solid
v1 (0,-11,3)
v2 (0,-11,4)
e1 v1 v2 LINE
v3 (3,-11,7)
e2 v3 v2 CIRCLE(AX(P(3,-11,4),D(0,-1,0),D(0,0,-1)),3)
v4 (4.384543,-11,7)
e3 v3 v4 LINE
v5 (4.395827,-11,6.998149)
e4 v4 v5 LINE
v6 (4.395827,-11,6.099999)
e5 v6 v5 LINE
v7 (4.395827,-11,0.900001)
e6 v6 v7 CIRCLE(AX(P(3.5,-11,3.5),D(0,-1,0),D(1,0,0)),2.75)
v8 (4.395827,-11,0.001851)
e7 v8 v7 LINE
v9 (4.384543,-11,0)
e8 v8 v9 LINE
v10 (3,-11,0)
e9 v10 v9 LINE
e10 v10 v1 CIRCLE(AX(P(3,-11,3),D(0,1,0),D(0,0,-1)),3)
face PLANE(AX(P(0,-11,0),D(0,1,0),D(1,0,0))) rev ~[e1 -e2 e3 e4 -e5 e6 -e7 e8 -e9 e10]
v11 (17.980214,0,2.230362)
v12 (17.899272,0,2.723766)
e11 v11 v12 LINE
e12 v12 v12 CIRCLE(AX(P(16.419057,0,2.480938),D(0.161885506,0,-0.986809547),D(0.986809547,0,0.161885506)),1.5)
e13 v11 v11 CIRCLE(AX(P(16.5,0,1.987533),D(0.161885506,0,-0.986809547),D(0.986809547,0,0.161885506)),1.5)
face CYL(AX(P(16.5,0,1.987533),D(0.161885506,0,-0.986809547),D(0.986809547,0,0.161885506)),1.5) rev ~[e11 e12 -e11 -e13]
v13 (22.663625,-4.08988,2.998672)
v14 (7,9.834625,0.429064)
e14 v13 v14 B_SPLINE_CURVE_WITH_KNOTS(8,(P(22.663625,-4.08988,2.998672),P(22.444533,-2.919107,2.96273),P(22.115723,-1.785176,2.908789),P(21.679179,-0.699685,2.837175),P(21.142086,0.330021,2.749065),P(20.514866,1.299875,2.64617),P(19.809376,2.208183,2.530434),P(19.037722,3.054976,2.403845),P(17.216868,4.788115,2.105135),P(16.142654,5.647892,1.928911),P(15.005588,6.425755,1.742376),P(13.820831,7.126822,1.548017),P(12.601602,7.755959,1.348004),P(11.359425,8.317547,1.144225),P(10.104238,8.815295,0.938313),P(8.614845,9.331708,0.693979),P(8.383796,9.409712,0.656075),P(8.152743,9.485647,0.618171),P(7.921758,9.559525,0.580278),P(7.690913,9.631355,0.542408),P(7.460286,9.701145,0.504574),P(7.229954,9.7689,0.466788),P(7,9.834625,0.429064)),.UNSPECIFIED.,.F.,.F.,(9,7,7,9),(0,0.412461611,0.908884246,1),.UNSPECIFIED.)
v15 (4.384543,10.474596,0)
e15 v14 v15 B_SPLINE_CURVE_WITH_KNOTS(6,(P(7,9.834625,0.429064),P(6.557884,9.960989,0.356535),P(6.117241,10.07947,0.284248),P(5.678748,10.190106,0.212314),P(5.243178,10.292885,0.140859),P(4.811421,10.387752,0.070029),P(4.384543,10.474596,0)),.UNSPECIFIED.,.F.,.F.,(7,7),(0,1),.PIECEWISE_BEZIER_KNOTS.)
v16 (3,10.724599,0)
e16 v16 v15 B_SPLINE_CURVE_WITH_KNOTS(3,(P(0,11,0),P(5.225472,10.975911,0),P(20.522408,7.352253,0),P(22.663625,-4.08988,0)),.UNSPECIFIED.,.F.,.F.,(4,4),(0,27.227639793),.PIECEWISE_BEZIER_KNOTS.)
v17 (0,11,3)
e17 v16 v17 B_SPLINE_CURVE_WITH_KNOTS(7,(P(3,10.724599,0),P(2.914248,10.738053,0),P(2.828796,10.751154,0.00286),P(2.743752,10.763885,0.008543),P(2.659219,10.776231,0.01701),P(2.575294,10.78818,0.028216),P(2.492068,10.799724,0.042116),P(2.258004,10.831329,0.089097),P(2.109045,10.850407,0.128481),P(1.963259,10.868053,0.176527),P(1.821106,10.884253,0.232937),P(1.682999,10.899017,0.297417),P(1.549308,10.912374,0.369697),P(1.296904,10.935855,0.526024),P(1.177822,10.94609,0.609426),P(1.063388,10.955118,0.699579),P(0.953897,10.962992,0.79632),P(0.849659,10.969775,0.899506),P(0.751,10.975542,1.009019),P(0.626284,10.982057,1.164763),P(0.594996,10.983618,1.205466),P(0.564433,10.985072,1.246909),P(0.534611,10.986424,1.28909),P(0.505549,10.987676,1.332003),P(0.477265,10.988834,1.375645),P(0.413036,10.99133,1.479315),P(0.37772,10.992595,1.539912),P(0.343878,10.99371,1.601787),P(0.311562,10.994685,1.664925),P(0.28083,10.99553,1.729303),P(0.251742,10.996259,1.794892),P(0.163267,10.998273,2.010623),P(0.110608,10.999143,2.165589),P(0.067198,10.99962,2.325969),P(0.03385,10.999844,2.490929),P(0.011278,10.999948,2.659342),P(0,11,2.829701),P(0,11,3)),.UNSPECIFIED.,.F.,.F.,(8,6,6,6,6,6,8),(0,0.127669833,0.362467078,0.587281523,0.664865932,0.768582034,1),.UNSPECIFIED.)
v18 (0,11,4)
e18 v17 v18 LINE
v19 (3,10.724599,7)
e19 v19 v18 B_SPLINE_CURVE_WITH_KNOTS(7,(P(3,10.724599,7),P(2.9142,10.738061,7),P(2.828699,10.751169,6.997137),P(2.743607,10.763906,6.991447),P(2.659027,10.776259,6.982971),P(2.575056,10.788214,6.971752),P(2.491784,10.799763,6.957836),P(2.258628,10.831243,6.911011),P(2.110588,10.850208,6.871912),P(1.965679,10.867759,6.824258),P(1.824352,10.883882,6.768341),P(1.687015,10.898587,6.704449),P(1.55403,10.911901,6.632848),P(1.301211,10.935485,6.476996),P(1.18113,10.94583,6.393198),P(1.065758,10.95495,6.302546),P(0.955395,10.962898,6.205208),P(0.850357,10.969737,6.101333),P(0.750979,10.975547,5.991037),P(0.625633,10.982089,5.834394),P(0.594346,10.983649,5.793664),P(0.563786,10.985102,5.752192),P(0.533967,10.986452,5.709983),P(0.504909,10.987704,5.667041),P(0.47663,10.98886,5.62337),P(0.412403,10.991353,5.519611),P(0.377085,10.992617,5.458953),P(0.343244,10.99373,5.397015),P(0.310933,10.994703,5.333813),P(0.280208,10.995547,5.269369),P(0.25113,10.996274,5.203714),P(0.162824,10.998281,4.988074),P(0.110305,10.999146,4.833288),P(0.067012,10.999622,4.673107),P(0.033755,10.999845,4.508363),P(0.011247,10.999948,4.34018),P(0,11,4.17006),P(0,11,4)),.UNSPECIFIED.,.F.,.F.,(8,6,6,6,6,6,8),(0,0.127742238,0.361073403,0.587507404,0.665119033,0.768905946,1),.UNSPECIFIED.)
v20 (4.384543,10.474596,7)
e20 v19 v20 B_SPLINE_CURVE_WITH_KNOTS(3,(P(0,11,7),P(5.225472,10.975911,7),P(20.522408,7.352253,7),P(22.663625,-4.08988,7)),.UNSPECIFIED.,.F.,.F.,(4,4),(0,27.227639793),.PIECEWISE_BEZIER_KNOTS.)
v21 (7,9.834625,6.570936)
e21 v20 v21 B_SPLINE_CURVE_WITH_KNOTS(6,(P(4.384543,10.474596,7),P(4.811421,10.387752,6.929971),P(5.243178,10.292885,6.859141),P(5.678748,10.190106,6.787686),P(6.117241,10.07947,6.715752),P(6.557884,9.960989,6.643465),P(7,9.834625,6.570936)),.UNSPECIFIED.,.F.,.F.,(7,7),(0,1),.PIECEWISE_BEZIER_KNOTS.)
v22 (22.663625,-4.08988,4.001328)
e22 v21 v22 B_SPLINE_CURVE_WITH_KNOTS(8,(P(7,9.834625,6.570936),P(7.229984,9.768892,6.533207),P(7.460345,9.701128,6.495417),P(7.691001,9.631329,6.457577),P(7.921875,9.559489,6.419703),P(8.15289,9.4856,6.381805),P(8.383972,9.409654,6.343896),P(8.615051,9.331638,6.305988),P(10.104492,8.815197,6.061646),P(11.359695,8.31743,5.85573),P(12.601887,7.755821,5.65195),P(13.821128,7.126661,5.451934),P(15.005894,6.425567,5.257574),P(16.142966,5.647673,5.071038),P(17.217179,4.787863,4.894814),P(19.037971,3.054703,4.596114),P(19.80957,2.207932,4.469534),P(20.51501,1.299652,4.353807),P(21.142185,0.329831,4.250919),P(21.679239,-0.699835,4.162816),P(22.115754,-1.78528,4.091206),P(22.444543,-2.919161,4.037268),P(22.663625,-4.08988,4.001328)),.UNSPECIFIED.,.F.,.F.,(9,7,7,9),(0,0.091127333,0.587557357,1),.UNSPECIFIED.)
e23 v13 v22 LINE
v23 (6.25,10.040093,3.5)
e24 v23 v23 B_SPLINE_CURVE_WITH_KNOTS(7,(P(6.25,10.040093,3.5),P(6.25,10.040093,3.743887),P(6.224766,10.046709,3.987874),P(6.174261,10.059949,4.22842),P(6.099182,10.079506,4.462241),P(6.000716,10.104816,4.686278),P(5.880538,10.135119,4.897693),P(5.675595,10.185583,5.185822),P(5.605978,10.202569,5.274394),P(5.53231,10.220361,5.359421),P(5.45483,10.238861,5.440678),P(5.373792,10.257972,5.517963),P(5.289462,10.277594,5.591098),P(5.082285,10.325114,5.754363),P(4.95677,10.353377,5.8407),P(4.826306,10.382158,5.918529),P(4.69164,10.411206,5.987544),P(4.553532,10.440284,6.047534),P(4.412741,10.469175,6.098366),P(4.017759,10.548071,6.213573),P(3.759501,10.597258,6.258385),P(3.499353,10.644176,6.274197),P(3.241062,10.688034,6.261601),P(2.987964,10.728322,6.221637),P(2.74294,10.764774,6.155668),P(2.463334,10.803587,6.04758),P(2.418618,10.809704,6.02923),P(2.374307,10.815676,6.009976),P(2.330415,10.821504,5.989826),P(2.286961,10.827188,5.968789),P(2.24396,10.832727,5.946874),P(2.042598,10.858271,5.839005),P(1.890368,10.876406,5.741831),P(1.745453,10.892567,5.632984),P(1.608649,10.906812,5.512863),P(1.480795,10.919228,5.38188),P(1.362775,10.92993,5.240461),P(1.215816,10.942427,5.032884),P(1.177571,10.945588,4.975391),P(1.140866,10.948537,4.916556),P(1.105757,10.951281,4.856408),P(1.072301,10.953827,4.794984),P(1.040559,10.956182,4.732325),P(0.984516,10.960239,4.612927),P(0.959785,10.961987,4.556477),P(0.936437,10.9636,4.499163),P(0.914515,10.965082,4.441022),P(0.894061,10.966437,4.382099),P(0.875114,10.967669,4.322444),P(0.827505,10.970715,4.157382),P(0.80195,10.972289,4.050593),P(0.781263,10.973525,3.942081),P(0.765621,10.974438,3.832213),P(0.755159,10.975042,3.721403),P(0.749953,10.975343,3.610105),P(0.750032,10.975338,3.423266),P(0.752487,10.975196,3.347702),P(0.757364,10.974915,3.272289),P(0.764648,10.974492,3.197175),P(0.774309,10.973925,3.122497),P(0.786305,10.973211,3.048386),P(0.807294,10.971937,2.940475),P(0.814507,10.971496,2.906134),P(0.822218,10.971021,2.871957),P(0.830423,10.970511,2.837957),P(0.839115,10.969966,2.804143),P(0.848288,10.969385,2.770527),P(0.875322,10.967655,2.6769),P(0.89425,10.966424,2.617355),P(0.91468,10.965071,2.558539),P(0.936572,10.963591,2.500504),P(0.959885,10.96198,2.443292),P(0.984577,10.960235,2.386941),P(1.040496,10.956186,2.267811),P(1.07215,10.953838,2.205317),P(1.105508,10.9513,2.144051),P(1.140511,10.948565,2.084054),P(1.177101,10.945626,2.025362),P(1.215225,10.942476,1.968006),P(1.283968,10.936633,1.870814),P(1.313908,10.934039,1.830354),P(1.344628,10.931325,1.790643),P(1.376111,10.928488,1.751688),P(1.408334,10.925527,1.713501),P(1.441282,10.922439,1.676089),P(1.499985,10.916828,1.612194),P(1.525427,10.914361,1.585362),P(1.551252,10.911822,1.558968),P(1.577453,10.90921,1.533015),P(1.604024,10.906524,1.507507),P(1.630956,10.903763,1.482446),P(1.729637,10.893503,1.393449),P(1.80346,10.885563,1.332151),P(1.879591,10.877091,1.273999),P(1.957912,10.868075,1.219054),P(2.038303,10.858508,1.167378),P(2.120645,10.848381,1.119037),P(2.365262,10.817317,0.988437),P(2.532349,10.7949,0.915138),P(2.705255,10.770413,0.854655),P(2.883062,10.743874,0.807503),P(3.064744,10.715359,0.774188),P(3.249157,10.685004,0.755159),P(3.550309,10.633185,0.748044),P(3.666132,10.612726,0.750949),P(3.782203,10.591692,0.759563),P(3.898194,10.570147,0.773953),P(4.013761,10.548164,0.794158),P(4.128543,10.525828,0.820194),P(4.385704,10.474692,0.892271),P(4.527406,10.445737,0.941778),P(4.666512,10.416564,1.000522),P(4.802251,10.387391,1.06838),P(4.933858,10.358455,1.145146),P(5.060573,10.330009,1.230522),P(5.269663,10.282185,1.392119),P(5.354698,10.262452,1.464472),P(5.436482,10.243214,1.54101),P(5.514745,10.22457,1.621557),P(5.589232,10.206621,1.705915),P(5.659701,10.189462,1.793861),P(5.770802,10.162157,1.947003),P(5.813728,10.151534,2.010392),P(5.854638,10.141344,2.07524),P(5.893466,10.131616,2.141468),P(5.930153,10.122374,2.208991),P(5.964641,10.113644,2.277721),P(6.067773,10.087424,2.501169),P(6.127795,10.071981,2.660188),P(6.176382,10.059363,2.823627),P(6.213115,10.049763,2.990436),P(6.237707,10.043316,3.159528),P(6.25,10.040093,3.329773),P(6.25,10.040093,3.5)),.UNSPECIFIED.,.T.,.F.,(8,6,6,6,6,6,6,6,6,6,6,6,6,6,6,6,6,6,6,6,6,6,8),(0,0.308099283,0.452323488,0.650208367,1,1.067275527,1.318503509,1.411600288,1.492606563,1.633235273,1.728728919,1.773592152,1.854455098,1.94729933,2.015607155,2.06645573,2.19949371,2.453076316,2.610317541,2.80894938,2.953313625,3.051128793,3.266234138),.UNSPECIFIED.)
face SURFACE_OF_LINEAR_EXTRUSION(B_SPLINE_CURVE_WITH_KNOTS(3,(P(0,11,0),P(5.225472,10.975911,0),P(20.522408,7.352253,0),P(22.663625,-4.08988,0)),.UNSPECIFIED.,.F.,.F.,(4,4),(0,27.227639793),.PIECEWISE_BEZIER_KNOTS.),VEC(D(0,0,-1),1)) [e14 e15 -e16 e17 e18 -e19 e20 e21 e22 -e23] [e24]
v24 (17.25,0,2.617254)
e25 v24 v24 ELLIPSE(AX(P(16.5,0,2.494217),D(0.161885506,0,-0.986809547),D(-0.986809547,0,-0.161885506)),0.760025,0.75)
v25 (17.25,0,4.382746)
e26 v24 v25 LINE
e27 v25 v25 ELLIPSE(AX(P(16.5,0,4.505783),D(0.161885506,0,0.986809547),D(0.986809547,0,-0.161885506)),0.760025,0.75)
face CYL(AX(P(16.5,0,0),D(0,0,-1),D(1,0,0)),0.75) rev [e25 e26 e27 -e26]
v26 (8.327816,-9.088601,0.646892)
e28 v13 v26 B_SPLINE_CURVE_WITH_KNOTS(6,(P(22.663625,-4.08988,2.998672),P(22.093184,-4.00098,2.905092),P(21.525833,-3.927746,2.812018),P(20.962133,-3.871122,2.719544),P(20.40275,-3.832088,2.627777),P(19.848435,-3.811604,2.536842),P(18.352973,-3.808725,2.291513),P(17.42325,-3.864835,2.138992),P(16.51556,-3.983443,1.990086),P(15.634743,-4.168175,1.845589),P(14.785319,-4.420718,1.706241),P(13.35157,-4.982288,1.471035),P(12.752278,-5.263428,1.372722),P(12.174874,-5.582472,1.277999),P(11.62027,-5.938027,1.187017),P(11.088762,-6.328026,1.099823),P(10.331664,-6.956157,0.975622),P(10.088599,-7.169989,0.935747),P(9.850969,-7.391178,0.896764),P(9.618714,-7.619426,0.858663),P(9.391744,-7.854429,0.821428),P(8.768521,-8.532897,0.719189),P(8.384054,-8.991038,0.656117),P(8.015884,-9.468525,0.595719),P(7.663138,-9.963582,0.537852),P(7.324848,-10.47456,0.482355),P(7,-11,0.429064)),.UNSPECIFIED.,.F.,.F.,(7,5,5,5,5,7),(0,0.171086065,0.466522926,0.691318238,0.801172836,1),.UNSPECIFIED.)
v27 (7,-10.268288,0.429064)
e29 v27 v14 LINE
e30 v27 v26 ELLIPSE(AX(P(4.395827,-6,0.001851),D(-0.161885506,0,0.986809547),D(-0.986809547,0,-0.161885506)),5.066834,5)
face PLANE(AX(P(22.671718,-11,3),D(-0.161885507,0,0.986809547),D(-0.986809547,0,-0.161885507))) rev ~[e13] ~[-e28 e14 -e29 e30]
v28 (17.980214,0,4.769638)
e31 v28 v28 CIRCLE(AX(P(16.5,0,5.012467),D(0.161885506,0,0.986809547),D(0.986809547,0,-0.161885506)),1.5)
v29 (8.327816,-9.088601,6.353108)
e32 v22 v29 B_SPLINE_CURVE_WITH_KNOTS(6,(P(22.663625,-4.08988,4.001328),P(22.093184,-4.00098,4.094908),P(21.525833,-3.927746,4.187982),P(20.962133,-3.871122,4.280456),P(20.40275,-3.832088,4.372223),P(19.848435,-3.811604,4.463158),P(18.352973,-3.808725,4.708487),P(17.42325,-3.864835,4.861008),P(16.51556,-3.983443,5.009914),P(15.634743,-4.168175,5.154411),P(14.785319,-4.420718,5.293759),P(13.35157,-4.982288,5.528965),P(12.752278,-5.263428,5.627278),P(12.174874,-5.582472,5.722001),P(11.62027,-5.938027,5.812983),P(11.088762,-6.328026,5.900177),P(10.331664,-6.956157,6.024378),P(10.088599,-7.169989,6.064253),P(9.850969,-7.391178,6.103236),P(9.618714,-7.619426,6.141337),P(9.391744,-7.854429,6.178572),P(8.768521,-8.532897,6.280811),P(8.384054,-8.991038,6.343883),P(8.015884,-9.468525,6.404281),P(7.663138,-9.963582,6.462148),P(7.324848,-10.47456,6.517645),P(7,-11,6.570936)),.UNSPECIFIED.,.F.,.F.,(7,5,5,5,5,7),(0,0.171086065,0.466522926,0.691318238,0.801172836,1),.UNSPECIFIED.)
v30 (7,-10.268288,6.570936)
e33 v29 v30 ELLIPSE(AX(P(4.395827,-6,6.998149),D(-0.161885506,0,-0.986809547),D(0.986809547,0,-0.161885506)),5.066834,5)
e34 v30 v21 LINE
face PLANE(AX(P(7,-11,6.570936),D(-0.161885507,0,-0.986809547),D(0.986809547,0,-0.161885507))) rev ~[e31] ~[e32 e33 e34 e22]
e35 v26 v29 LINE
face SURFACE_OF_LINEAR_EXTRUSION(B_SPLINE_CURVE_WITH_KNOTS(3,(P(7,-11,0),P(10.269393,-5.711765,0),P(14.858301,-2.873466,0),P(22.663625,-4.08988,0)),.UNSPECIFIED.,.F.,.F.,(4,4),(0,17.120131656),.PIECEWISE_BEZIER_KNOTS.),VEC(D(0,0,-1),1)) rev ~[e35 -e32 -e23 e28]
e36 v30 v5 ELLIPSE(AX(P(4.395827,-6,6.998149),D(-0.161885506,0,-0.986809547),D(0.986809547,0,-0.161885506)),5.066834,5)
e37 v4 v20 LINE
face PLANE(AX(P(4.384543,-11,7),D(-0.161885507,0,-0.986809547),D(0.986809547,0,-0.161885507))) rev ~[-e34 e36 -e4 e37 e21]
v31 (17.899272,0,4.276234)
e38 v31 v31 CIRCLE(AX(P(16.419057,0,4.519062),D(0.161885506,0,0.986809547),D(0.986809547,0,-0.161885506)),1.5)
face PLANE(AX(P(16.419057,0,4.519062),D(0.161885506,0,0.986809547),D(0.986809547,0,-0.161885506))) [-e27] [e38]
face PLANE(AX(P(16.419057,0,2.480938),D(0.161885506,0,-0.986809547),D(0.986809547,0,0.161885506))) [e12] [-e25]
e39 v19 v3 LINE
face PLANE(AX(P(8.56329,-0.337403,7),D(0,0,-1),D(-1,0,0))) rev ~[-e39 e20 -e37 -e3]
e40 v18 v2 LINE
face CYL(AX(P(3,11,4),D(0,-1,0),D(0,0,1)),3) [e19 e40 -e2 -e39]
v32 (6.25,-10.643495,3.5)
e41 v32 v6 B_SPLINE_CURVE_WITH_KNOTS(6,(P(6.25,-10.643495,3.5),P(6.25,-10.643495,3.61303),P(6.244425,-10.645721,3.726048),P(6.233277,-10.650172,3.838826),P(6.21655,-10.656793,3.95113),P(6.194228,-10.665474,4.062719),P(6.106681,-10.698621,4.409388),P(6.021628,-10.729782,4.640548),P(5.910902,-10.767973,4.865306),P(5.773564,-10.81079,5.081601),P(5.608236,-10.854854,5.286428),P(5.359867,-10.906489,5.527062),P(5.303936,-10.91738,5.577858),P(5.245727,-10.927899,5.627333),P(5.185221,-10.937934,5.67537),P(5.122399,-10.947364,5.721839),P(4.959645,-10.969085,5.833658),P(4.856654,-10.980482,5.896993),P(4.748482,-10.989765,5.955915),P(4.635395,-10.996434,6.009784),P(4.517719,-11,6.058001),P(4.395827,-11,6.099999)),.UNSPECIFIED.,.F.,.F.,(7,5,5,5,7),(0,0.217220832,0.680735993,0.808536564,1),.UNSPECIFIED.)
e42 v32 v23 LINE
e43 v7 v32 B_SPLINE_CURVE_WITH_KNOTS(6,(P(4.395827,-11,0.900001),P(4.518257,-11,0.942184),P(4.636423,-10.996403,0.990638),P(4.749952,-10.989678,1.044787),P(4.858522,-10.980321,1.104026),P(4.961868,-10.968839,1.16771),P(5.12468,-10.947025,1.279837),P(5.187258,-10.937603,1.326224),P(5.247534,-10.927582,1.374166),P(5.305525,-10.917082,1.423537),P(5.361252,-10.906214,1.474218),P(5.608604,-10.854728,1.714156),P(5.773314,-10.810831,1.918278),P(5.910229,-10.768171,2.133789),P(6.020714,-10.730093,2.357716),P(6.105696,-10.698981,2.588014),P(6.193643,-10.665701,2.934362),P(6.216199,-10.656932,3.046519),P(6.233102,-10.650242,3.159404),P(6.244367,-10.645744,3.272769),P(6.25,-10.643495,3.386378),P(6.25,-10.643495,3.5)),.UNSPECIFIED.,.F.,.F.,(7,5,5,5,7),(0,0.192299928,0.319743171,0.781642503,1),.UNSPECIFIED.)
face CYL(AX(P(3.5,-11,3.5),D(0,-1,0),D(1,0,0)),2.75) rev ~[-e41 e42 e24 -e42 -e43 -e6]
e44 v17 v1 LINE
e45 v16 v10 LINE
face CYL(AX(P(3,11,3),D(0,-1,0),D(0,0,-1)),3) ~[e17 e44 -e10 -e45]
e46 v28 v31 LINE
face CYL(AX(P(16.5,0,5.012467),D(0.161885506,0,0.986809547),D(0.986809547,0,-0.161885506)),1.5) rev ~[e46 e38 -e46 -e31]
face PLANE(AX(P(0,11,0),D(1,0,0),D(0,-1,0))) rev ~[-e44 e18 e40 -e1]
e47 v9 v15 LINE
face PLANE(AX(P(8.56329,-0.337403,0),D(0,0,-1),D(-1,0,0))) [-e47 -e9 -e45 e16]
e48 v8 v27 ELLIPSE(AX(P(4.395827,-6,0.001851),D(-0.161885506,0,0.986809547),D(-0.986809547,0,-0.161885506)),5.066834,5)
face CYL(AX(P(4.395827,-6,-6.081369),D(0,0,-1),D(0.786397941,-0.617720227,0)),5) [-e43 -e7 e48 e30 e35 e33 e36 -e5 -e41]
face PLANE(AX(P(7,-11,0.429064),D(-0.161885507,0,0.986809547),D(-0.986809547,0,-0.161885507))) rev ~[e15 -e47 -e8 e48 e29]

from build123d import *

# Parameters (mm, degrees)
F0_R         = 0.75
F1_DEPTH     = 7
F2_R         = 2.75
F3_DEPTH     = 25
F4_R         = 3
F6_DEPTH     = 25
F7_R         = 1.5
F8_DEPTH     = 0.5
F9_R         = 1.5
F10_DEPTH    = 0.5
F11_T4_DEPTH = 19.1627380087


# Not quite as in the source:
# - a fillet or chamfer that OpenCascade refuses, or shapes differently, is made with other operations: its cross-section is extruded or revolved along the edge and cut away or added


with BuildPart() as f1:
    # F0 (on Top) → F1 (new body)
    with BuildSketch(Plane.XY):
        with BuildLine():
            add(Edge.make_bspline(
                [(0, 11), (5.2254716866, 10.975911282), (20.5224081874, 7.3522534221), (22.6636249572, -4.0898798034)],
                knots=[0, 0, 0, 0, 27.2276397927, 27.2276397927, 27.2276397927, 27.2276397927], degree=3))
            Line((0, 11), (0, -11))
            Line((0, -11), (7, -11))
            add(Edge.make_bspline(
                [(7, -11), (10.2693928853, -5.7117650285), (14.8583007976, -2.8734656516), (22.6636249572, -4.0898798034)],
                knots=[0, 0, 0, 0, 17.1201316564, 17.1201316564, 17.1201316564, 17.1201316564], degree=3))
        make_face()
        with Locations((16.5, 0)):
            Circle(F0_R, mode=Mode.SUBTRACT)
    extrude(amount=F1_DEPTH)

    # F2 (on face) → F3 (cut)
    with BuildSketch(Plane.XZ.offset(11)):
        with Locations((3.5, 3.5)):
            Circle(F2_R)
    extrude(amount=-F3_DEPTH, mode=Mode.SUBTRACT)

    # F4
    f4_edges = [f1.edges().sort_by_distance(p)[0] for p in [
        (0, 0, 0),
        (0, 0, 7),
    ]]
    fillet(f4_edges, radius=F4_R)

    # F5 (on face) → F6 (cut)
    with BuildSketch(Plane.XZ.offset(11)):
        Polygon((7, 6.5709358384), (22.6717181504, 4), (26.1740684509, 7.8573133796), (11.5607753396, 11.3733848557), (4.3845428154, 7), (7, 7), align=None)
        Polygon((26.1740684509, -0.8573133796), (22.6717181504, 3), (7, 0.4290641616), (7, 0), (4.3845428154, 0), (11.5607753396, -4.3733848557), align=None)
        Polygon((4.3845428154, 7), (7, 6.5709358384), (7, 7), align=None)
        Polygon((7, 0), (7, 0.4290641616), (4.3845428154, 0), align=None)
    extrude(amount=-F6_DEPTH, mode=Mode.SUBTRACT)

    # F7 (on face) → F8 (cut)
    with BuildSketch(Plane(origin=(1.2331564946, 0, 7.5169830107), x_dir=(0.9868095474, 0, -0.1618855065), z_dir=(0.1618855065, 0, 0.9868095474))):
        with Locations((15.4709118351, 0)):
            Circle(F7_R)
    extrude(amount=-F8_DEPTH, mode=Mode.SUBTRACT)

    # F9 (on face) → F10 (cut)
    with BuildSketch(Plane(origin=(0.1149053506, 0, -0.7004314313), x_dir=(0.9868095474, 0, 0.1618855065), z_dir=(0.1618855065, 0, -0.9868095474))):
        with Locations((16.6041103809, 0)):
            Circle(F9_R)
    extrude(amount=-F10_DEPTH, mode=Mode.SUBTRACT)

    # F11: fillet of radius 5 on 1 edges, made by hand


with BuildPart() as f11_tool2:
    # F11_s3 → F11_t4 (new body)
    with BuildSketch(Plane.XY.offset(-6.0813690043)):
        with BuildLine():
            ThreePointArc((8.3278164384, -9.0886011335), (6.5818041274, -10.4968325334), (4.3958267336, -11))
            Line((4.3958267336, -11), (4.3958267336, -11.1))
            Line((4.3958267336, -11.1), (7, -11.1))
            Line((7, -11.1), (7.0850572831, -11.0525857262))
            ThreePointArc((7.0850572831, -11.0525857262), (7.7193199568, -10.0826857854), (8.4064562325, -9.1503731561))
            Line((8.4064562325, -9.1503731561), (8.3278164384, -9.0886011335))
        make_face()
    extrude(amount=F11_T4_DEPTH)

    split(bisect_by=Plane(origin=(0.1149053506, 0, -0.7004314313), x_dir=(0, 1, 0), z_dir=(-0.1618855065, 0, 0.9868095474)), keep=Keep.TOP)

    split(bisect_by=Plane(origin=(1.2331564946, 0, 7.5169830107), x_dir=(0, 1, 0), z_dir=(-0.1618855065, 0, -0.9868095474)), keep=Keep.TOP)


with BuildPart() as f1_1:
    add(f1.part)

    # F11_t1: cut F11_tool2
    add(f11_tool2.part, mode=Mode.SUBTRACT)


solid = f1_1.part
